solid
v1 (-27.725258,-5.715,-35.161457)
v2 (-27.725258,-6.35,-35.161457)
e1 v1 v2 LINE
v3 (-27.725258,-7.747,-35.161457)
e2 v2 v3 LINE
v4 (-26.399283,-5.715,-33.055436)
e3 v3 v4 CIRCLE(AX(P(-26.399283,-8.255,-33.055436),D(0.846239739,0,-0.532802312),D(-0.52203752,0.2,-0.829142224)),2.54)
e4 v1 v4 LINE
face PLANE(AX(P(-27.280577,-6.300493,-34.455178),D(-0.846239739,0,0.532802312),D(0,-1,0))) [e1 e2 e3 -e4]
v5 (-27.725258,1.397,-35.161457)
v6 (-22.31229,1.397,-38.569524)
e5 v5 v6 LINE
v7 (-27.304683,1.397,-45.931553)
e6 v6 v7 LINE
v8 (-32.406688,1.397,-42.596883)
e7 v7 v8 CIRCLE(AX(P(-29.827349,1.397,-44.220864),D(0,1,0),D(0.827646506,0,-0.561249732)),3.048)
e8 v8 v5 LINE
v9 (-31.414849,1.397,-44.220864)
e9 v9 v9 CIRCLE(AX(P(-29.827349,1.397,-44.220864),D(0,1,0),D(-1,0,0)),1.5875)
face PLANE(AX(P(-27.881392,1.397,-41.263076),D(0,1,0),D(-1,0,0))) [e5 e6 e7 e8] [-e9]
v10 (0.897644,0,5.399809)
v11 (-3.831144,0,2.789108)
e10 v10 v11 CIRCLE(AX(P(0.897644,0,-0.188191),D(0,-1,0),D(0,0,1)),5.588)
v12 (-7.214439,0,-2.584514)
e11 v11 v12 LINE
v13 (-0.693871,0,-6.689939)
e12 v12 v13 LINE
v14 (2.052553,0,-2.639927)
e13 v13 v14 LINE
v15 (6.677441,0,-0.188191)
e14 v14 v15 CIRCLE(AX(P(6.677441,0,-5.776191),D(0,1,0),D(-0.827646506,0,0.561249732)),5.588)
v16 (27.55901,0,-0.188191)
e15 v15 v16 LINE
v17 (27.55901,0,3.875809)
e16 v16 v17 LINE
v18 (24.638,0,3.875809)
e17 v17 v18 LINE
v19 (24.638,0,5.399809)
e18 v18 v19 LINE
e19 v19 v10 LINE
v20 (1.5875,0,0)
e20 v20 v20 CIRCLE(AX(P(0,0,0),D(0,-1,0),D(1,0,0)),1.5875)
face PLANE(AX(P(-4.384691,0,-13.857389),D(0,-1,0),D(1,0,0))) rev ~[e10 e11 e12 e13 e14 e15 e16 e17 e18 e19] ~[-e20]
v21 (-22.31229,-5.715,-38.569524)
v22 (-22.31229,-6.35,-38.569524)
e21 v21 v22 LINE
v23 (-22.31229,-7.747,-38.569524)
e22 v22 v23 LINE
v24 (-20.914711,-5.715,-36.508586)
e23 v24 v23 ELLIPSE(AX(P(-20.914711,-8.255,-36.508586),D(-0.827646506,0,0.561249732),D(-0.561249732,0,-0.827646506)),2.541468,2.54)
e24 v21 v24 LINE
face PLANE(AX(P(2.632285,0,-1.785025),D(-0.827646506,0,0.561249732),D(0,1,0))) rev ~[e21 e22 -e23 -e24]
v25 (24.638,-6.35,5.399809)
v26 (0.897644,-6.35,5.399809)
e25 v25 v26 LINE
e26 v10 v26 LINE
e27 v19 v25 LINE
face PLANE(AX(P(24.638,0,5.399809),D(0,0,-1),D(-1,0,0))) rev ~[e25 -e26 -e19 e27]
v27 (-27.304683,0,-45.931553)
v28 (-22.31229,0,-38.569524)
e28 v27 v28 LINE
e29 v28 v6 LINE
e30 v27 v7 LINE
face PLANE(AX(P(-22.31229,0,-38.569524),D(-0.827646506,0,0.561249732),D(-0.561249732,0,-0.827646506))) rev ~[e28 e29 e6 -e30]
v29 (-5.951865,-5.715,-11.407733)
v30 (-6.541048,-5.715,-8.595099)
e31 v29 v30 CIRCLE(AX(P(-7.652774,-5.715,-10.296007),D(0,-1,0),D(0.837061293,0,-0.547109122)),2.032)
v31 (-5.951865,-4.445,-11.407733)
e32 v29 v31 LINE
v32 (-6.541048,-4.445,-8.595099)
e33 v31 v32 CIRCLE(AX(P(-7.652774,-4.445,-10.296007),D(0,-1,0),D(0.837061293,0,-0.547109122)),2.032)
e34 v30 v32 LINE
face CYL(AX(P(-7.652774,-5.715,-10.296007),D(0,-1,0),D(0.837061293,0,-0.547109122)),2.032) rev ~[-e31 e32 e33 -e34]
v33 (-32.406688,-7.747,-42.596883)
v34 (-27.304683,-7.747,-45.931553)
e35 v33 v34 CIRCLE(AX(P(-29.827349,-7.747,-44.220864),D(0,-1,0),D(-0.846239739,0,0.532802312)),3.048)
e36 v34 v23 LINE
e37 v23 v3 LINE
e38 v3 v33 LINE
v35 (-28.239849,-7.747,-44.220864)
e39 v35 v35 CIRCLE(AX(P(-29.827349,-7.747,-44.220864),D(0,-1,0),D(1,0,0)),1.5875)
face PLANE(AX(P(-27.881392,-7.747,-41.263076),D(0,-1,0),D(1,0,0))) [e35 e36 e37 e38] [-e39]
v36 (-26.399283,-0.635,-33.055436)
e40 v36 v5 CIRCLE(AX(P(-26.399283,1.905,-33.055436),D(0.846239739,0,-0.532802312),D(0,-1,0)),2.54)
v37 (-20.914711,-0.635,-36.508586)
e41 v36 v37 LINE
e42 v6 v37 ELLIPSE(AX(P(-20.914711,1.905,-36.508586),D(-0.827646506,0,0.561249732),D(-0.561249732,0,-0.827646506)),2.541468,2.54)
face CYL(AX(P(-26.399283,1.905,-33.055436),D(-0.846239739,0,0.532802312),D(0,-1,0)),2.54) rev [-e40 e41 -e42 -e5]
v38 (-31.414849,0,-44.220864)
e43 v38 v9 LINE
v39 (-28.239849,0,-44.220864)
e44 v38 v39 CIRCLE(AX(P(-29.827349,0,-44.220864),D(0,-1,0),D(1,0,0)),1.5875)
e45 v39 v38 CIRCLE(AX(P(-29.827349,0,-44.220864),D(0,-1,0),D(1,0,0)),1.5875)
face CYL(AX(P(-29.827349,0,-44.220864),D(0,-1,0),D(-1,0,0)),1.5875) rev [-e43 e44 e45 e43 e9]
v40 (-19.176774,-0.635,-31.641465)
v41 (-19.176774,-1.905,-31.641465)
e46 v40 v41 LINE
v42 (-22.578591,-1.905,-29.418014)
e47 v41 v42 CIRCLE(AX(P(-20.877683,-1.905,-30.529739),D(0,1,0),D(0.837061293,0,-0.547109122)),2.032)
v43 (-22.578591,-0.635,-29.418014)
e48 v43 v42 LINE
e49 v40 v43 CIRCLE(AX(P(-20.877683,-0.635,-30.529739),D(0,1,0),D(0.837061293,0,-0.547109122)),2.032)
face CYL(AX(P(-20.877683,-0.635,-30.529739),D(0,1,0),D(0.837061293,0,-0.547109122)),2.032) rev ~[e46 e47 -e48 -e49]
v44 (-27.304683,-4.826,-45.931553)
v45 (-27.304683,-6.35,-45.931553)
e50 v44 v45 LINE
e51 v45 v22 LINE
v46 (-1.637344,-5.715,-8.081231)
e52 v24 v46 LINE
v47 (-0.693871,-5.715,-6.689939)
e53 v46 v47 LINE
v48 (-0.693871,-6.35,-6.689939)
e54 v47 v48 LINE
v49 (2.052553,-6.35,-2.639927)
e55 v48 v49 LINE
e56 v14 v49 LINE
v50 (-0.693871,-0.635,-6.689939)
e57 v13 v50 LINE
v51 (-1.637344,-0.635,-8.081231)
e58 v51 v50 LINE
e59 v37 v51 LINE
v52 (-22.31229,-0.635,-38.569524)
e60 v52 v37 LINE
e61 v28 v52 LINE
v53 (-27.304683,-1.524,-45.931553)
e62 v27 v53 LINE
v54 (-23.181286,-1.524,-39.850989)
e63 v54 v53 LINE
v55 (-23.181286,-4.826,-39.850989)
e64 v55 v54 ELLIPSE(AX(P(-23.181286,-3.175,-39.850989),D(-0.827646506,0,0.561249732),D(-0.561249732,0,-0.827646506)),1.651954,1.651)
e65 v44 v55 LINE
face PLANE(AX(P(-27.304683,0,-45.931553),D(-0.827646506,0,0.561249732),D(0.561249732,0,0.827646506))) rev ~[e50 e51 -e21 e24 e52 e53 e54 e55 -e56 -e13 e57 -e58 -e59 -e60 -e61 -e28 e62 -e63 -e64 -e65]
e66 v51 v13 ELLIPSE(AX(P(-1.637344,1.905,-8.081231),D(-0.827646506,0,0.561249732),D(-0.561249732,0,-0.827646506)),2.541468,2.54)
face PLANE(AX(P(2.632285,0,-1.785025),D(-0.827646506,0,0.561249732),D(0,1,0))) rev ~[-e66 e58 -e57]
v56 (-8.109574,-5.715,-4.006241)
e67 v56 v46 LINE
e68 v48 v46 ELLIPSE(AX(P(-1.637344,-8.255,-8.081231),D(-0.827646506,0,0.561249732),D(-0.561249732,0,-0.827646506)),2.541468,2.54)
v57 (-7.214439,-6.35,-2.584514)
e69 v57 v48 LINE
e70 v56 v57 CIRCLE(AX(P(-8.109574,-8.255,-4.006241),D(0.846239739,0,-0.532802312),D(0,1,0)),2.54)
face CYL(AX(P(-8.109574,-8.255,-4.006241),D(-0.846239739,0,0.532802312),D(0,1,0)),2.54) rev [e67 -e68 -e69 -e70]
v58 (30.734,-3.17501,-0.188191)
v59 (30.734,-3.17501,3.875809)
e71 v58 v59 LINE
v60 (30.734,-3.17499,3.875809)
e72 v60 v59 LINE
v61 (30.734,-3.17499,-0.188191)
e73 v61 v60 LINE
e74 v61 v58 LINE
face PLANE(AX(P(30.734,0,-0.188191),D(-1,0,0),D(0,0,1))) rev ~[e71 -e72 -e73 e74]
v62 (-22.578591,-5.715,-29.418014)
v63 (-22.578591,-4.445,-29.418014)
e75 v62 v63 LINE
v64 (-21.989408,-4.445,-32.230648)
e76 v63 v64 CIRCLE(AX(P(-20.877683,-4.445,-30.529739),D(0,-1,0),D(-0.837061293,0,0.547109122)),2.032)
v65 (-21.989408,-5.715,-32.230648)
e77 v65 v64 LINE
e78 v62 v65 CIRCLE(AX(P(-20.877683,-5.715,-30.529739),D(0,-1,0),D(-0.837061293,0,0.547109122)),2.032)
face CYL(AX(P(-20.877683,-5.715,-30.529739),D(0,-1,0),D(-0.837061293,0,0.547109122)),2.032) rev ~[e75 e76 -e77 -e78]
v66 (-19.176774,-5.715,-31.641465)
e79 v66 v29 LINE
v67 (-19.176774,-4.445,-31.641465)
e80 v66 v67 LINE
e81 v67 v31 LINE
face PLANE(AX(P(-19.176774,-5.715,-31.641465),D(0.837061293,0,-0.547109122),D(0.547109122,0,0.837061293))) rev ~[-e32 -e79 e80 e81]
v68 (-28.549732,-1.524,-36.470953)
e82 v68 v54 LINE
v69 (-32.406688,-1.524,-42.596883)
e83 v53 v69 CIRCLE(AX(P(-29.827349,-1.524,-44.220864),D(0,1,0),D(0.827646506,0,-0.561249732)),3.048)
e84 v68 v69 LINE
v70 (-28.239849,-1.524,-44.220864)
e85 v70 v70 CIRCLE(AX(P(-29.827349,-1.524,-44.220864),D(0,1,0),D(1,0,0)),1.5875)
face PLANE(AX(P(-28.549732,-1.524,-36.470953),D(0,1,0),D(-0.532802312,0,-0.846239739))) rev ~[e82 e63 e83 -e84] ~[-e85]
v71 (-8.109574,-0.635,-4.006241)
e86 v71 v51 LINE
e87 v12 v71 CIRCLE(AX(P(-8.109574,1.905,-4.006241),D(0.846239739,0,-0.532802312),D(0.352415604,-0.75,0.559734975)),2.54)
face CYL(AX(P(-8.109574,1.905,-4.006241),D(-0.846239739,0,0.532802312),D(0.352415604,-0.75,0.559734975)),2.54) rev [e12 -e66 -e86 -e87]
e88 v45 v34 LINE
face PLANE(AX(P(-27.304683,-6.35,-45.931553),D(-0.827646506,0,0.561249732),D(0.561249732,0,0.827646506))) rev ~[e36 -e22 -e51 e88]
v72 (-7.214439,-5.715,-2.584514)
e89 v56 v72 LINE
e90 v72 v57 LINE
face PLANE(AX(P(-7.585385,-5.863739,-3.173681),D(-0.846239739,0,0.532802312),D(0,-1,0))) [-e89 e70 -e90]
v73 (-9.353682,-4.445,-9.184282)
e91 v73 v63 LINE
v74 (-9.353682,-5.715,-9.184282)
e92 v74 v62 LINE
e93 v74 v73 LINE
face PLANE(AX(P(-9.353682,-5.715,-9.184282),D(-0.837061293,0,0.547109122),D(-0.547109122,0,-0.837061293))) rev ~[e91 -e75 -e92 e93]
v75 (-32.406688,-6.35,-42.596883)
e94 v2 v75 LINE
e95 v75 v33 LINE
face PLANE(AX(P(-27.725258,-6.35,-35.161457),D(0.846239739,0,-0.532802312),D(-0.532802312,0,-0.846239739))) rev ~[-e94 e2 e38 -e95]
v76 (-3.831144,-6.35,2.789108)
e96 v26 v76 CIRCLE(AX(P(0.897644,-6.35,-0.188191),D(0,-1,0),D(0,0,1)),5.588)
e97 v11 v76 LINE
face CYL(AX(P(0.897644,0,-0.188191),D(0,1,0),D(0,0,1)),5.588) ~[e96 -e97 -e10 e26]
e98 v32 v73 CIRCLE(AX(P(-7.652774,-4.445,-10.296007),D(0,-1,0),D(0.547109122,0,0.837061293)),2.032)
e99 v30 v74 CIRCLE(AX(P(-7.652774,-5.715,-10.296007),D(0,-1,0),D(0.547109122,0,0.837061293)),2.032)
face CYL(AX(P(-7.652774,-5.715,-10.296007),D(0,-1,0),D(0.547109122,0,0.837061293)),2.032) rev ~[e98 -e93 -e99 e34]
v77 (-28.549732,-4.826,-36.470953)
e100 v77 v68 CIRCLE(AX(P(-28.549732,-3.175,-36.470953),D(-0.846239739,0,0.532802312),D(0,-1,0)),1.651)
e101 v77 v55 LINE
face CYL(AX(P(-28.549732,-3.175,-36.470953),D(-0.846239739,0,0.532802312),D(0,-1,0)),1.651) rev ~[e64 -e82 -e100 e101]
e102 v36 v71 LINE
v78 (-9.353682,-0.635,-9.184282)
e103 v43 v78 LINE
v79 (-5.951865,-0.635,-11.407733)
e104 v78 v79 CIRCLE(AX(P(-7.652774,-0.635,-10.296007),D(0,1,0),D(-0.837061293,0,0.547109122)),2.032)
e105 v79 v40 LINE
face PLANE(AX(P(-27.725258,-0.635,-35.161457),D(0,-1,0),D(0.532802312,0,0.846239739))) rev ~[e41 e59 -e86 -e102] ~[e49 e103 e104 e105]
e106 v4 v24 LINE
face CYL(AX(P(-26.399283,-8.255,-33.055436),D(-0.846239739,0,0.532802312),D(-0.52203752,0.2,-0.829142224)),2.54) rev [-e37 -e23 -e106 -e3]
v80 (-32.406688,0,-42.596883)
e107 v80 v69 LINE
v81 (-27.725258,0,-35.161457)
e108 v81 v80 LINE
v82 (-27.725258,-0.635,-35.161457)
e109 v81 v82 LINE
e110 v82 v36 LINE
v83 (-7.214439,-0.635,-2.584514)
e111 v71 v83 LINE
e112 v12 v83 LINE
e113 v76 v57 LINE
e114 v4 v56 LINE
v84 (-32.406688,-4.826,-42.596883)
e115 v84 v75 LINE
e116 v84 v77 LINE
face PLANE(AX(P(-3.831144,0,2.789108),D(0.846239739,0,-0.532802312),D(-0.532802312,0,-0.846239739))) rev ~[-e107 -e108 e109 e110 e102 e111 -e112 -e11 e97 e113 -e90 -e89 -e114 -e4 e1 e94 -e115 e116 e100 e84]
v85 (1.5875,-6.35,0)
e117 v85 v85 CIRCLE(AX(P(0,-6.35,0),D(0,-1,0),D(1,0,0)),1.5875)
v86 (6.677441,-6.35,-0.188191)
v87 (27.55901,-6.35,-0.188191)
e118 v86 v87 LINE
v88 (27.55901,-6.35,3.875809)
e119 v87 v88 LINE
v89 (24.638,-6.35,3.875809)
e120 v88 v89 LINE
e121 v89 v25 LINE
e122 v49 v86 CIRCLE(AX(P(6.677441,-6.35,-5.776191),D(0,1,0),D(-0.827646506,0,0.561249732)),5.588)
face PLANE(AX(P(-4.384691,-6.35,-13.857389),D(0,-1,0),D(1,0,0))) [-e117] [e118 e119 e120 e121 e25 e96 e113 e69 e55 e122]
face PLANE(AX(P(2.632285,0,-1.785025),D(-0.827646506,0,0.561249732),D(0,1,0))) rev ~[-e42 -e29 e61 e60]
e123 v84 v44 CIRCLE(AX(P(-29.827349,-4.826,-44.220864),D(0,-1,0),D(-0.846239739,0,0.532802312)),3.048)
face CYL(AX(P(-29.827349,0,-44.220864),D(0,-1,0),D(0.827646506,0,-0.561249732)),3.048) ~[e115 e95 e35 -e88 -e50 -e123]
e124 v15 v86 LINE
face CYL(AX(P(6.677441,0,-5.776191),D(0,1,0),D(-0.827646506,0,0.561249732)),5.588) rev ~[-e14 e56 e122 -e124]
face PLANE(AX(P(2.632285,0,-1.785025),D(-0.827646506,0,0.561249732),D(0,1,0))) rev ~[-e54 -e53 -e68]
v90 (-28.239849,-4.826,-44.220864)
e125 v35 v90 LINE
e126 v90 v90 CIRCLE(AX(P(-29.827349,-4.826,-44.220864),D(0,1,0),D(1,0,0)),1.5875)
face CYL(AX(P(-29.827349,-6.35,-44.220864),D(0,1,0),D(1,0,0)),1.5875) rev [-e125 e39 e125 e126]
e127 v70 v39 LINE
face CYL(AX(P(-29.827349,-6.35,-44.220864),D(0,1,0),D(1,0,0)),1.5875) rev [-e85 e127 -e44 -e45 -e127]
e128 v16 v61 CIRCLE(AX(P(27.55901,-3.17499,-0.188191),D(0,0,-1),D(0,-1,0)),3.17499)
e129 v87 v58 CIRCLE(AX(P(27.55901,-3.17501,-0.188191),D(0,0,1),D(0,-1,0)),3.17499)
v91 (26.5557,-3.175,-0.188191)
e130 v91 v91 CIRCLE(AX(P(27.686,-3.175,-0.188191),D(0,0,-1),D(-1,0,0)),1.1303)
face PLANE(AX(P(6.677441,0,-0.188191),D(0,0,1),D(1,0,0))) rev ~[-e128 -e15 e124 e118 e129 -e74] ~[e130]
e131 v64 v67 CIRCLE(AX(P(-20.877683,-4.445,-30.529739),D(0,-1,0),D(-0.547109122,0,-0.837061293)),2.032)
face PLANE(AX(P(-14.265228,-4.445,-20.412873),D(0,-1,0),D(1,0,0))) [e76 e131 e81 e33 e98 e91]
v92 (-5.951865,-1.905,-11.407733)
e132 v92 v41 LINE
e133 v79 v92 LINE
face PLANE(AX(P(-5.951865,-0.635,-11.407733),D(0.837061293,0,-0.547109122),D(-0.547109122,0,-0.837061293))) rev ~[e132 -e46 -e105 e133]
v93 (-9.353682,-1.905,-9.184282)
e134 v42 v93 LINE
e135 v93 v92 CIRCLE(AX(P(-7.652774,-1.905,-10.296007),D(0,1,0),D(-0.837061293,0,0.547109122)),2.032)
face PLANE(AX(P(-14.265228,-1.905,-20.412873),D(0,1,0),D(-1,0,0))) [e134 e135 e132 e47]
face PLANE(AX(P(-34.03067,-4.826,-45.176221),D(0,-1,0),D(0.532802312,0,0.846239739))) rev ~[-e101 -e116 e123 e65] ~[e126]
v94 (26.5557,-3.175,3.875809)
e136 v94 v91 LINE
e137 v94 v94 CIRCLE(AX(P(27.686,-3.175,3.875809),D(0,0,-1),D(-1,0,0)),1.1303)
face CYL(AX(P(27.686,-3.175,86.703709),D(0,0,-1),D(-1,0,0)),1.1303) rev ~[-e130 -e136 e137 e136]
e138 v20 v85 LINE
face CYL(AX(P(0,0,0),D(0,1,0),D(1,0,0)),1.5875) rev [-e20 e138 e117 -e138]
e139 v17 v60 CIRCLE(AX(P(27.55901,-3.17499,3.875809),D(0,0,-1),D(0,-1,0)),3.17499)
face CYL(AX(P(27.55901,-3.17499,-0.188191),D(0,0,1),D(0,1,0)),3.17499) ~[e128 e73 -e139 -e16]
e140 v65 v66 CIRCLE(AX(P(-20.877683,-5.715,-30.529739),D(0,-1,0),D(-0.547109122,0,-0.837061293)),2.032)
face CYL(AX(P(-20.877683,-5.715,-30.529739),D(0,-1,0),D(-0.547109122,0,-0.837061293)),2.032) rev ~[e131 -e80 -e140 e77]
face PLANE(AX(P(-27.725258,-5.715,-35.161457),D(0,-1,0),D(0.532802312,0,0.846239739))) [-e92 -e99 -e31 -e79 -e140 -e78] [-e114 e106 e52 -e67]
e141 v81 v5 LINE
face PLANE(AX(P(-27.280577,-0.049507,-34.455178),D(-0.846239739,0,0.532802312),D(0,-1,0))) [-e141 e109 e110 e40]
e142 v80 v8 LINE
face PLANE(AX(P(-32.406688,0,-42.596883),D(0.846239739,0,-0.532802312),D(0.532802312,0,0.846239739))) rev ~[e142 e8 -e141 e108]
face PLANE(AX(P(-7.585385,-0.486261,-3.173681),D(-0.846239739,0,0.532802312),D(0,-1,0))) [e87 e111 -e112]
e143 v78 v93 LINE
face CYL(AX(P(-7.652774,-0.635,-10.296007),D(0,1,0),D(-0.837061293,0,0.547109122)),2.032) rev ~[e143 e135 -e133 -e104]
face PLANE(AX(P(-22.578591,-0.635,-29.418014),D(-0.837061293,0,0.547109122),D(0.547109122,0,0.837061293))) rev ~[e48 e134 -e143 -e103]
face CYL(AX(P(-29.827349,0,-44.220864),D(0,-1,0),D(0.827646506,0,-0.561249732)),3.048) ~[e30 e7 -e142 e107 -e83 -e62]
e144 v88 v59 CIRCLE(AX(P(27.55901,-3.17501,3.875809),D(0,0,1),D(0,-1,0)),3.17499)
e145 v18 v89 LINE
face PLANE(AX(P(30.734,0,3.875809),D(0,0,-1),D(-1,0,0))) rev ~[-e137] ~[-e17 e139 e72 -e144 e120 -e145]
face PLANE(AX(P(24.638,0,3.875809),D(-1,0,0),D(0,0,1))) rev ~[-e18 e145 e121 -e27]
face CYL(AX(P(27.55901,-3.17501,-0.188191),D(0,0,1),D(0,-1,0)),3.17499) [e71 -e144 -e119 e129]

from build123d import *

# Parameters (mm, degrees)
F0_R          = 1.5875
F1_DEPTH      = 6.35
F3_D          = 2.2606
F4_R          = 3.17499
F5_R          = 1.5875
F6_DEPTH      = 1.397
F7_R          = 1.5875
F8_DEPTH      = 1.397
F10_DEPTH     = 55.922402023
F11_W         = 0.635
F11_H         = 38.4961159321
F12_DEPTH     = 55.922402023
F13_T4_DEPTH  = 12.6181992369
F13_T9_DEPTH  = 12.6181992369
F13_T14_DEPTH = 11.9054737587
F13_T19_DEPTH = 11.9054737587
F15_DEPTH     = 1.27
F17_DEPTH     = 1.27


# Not quite as in the source:
# - a fillet or chamfer that OpenCascade refuses, or shapes differently, is made with other operations: its cross-section is extruded or revolved along the edge and cut away or added
# - a fillet or chamfer is up to 0.001 mm smaller than in the source, because OpenCascade refuses the exact size


with BuildPart() as f1:
    # F0 (on Front) → F1 (new body)
    with BuildSketch(Plane.XZ):
        with BuildLine():
            Line((6.6774413169, -0.1881909028), (30.734, -0.1881909028))
            Line((30.734, -0.1881909028), (30.734, 3.8758090972))
            Line((30.734, 3.8758090972), (24.638, 3.8758090972))
            Line((24.638, 3.8758090972), (24.638, 5.3998090972))
            Line((24.638, 5.3998090972), (0.8976435847, 5.3998090972))
            ThreePointArc((0.8976435847, 5.3998090972), (-1.8031521678, 4.7037868469), (-3.8311440773, 2.7891084184))
            Line((-3.8311440773, 2.7891084184), (-32.4066881959, -42.5968826722))
            ThreePointArc((-32.4066881959, -42.5968826722), (-31.4949255527, -46.7722351265), (-27.3046829217, -45.931553303))
            Line((-27.3046829217, -45.931553303), (2.052552643, -2.6399274008))
            ThreePointArc((2.052552643, -2.6399274008), (4.0601618562, -0.8390265117), (6.6774413169, -0.1881909028))
        make_face()
        with Locations((-29.8273494711, -44.2208641201)):
            Circle(F0_R, mode=Mode.SUBTRACT)
        Circle(F0_R, mode=Mode.SUBTRACT)
    extrude(amount=F1_DEPTH)

    # F3 (through all)
    with Locations(Plane.XY.offset(3.8758090972)):
        with Locations((27.686, -3.175)):
            Hole(F3_D / 2)

    # F4 (radius 3.175 in the source; OpenCascade refuses exactly that, so slightly less here)
    f4_edges = [f1.edges().sort_by_distance(p)[0] for p in [
        (30.734, -6.35, 1.843809),
        (30.734, 0, 1.843809),
    ]]
    fillet(f4_edges, radius=F4_R)

    # F5 (on face) → F6 (join)
    with BuildSketch(Plane.XZ.offset(6.35)):
        with BuildLine():
            Line((-27.3046829217, -45.931553303), (-22.3122897877, -38.5695244281))
            Line((-22.3122897877, -38.5695244281), (-27.7252582931, -35.1614569468))
            Line((-27.7252582931, -35.1614569468), (-32.4066881959, -42.5968826722))
            ThreePointArc((-32.4066881959, -42.5968826722), (-31.4949255527, -46.7722351265), (-27.3046829217, -45.931553303))
        make_face()
        with Locations((-29.8273494711, -44.2208641201)):
            Circle(F5_R, mode=Mode.SUBTRACT)
    extrude(amount=F6_DEPTH)

    # F7 (on face) → F8 (join)
    with BuildSketch(Plane(origin=(0, 0, 0), x_dir=(-1, 0, 0), z_dir=(0, 1, 0))):
        with BuildLine():
            ThreePointArc((27.3046829217, -45.931553303), (31.4949255527, -46.7722351265), (32.4066881959, -42.5968826722))
            Line((32.4066881959, -42.5968826722), (27.7252582931, -35.1614569468))
            Line((27.7252582931, -35.1614569468), (22.3122897877, -38.5695244281))
            Line((22.3122897877, -38.5695244281), (27.3046829217, -45.931553303))
        make_face()
        with Locations((29.8273494711, -44.2208641201)):
            Circle(F7_R, mode=Mode.SUBTRACT)
    extrude(amount=F8_DEPTH)

    # F9 (on face) → F10 (cut, through all)
    with BuildSketch(Plane(origin=(-4.0011143857, 0, 2.519147823), x_dir=(0, -1, 0), z_dir=(-0.8462397391, 0, 0.5328023123))):
        with BuildLine():
            Line((1.524, -56.3615332831), (4.826, -56.3615332831))
            Line((4.826, -56.3615332831), (4.826, -46.0745332831))
            ThreePointArc((4.826, -46.0745332831), (3.175, -44.4235332831), (1.524, -46.0745332831))
            Line((1.524, -46.0745332831), (1.524, -56.3615332831))
        make_face()
    extrude(amount=-F10_DEPTH, mode=Mode.SUBTRACT)

    # F11 (on face) → F12 (cut, through all)
    with BuildSketch(Plane(origin=(-4.0011143857, 0, 2.519147823), x_dir=(0, -1, 0), z_dir=(-0.8462397391, 0, 0.5328023123))):
        with Locations((0.3175, -25.2790459142)):
            Rectangle(F11_W, F11_H)
        with Locations((6.0325, -25.2790459142)):
            Rectangle(F11_W, F11_H)
    extrude(amount=-F12_DEPTH, mode=Mode.SUBTRACT)

    # F13: fillet of radius 2.54 on 4 edges, made by hand


with BuildPart() as f13_tool2:
    # F13_s3 → F13_t4 (new body)
    with BuildSketch(Plane(origin=(-4.0011143857, 0, 2.519147823), x_dir=(0, 1, 0), z_dir=(0.8462397391, 0, -0.5328023123))):
        with BuildLine():
            ThreePointArc((-7.747, -44.5271038802), (-6.2875244601, -43.6448593529), (-5.715, -42.0384223016))
            Line((-5.715, -42.0384223016), (-5.715, -44.5271038802))
            Line((-5.715, -44.5271038802), (-7.747, -44.5271038802))
        make_face()
    extrude(amount=F13_T4_DEPTH)

    split(bisect_by=Plane(origin=(2.6322854892, 0, -1.7850247841), x_dir=(0, 1, 0), z_dir=(-0.8276465057, 0, 0.5612497319)), keep=Keep.TOP)


with BuildPart() as f1_1:
    add(f1.part)

    # F13_t1: union F13_tool2
    add(f13_tool2.part)


with BuildPart() as f13_tool7:
    # F13_s8 → F13_t9 (new body)
    with BuildSketch(Plane(origin=(-4.0011143857, 0, 2.519147823), x_dir=(0, 1, 0), z_dir=(0.8462397391, 0, -0.5328023123))):
        with BuildLine():
            ThreePointArc((-0.635, -42.0384223016), (-0.0624755399, -43.6448593529), (1.397, -44.5271038802))
            Line((1.397, -44.5271038802), (-0.635, -44.5271038802))
            Line((-0.635, -44.5271038802), (-0.635, -42.0384223016))
        make_face()
    extrude(amount=F13_T9_DEPTH)

    split(bisect_by=Plane(origin=(2.6322854892, 0, -1.7850247841), x_dir=(0, 1, 0), z_dir=(-0.8276465057, 0, 0.5612497319)), keep=Keep.TOP)


with BuildPart() as f1_2:
    add(f1_1.part)

    # F13_t6: union F13_tool7
    add(f13_tool7.part)


with BuildPart() as f13_tool12:
    # F13_s13 → F13_t14 (new body)
    with BuildSketch(Plane(origin=(-4.0011143857, 0, 2.519147823), x_dir=(0, 1, 0), z_dir=(0.8462397391, 0, -0.5328023123))):
        with BuildLine():
            ThreePointArc((0, -6.0309879482), (-0.4709524406, -6.8130144186), (-0.635, -7.7110400307))
            Line((-0.635, -7.7110400307), (-0.635, -6.0309879482))
            Line((-0.635, -6.0309879482), (0, -6.0309879482))
        make_face()
    extrude(amount=F13_T14_DEPTH)

    split(bisect_by=Plane(origin=(2.6322854892, 0, -1.7850247841), x_dir=(0, 1, 0), z_dir=(-0.8276465057, 0, 0.5612497319)), keep=Keep.TOP)


with BuildPart() as f1_3:
    add(f1_2.part)

    # F13_t11: union F13_tool12
    add(f13_tool12.part)


with BuildPart() as f13_tool17:
    # F13_s18 → F13_t19 (new body)
    with BuildSketch(Plane(origin=(-4.0011143857, 0, 2.519147823), x_dir=(0, 1, 0), z_dir=(0.8462397391, 0, -0.5328023123))):
        with BuildLine():
            ThreePointArc((-5.715, -7.7110400307), (-5.8790475594, -6.8130144186), (-6.35, -6.0309879482))
            Line((-6.35, -6.0309879482), (-5.715, -6.0309879482))
            Line((-5.715, -6.0309879482), (-5.715, -7.7110400307))
        make_face()
    extrude(amount=F13_T19_DEPTH)

    split(bisect_by=Plane(origin=(2.6322854892, 0, -1.7850247841), x_dir=(0, 1, 0), z_dir=(-0.8276465057, 0, 0.5612497319)), keep=Keep.TOP)


with BuildPart() as f1_4:
    add(f1_3.part)

    # F13_t16: union F13_tool17
    add(f13_tool17.part)

    # F14 (on face) → F15 (cut)
    with BuildSketch(Plane.XZ.offset(5.715)):
        with BuildLine():
            ThreePointArc((-22.5785911234, -29.4180135738), (-22.8665153513, -30.9463544712), (-21.9894083128, -32.2306478578))
            ThreePointArc((-21.9894083128, -32.2306478578), (-20.4610674153, -32.5185720857), (-19.1767740287, -31.6414650472))
            Line((-19.1767740287, -31.6414650472), (-5.9518651728, -11.4077331396))
            ThreePointArc((-5.9518651728, -11.4077331396), (-5.6639409449, -9.8793922421), (-6.5410479835, -8.5950988555))
            ThreePointArc((-6.5410479835, -8.5950988555), (-8.0693888809, -8.3071746276), (-9.3536822675, -9.1842816662))
            Line((-9.3536822675, -9.1842816662), (-22.5785911234, -29.4180135738))
        make_face()
    extrude(amount=-F15_DEPTH, mode=Mode.SUBTRACT)

    # F16 (on face) → F17 (cut)
    with BuildSketch(Plane(origin=(0, -0.635, 0), x_dir=(-1, 0, 0), z_dir=(0, 1, 0))):
        with BuildLine():
            ThreePointArc((19.1767740287, -31.6414650472), (21.9894083128, -32.2306478578), (22.5785911234, -29.4180135738))
            Line((22.5785911234, -29.4180135738), (9.3536822675, -9.1842816662))
            ThreePointArc((9.3536822675, -9.1842816662), (6.5410479835, -8.5950988555), (5.9518651728, -11.4077331396))
            Line((5.9518651728, -11.4077331396), (19.1767740287, -31.6414650472))
        make_face()
    extrude(amount=-F17_DEPTH, mode=Mode.SUBTRACT)


solid = f1_4.part
